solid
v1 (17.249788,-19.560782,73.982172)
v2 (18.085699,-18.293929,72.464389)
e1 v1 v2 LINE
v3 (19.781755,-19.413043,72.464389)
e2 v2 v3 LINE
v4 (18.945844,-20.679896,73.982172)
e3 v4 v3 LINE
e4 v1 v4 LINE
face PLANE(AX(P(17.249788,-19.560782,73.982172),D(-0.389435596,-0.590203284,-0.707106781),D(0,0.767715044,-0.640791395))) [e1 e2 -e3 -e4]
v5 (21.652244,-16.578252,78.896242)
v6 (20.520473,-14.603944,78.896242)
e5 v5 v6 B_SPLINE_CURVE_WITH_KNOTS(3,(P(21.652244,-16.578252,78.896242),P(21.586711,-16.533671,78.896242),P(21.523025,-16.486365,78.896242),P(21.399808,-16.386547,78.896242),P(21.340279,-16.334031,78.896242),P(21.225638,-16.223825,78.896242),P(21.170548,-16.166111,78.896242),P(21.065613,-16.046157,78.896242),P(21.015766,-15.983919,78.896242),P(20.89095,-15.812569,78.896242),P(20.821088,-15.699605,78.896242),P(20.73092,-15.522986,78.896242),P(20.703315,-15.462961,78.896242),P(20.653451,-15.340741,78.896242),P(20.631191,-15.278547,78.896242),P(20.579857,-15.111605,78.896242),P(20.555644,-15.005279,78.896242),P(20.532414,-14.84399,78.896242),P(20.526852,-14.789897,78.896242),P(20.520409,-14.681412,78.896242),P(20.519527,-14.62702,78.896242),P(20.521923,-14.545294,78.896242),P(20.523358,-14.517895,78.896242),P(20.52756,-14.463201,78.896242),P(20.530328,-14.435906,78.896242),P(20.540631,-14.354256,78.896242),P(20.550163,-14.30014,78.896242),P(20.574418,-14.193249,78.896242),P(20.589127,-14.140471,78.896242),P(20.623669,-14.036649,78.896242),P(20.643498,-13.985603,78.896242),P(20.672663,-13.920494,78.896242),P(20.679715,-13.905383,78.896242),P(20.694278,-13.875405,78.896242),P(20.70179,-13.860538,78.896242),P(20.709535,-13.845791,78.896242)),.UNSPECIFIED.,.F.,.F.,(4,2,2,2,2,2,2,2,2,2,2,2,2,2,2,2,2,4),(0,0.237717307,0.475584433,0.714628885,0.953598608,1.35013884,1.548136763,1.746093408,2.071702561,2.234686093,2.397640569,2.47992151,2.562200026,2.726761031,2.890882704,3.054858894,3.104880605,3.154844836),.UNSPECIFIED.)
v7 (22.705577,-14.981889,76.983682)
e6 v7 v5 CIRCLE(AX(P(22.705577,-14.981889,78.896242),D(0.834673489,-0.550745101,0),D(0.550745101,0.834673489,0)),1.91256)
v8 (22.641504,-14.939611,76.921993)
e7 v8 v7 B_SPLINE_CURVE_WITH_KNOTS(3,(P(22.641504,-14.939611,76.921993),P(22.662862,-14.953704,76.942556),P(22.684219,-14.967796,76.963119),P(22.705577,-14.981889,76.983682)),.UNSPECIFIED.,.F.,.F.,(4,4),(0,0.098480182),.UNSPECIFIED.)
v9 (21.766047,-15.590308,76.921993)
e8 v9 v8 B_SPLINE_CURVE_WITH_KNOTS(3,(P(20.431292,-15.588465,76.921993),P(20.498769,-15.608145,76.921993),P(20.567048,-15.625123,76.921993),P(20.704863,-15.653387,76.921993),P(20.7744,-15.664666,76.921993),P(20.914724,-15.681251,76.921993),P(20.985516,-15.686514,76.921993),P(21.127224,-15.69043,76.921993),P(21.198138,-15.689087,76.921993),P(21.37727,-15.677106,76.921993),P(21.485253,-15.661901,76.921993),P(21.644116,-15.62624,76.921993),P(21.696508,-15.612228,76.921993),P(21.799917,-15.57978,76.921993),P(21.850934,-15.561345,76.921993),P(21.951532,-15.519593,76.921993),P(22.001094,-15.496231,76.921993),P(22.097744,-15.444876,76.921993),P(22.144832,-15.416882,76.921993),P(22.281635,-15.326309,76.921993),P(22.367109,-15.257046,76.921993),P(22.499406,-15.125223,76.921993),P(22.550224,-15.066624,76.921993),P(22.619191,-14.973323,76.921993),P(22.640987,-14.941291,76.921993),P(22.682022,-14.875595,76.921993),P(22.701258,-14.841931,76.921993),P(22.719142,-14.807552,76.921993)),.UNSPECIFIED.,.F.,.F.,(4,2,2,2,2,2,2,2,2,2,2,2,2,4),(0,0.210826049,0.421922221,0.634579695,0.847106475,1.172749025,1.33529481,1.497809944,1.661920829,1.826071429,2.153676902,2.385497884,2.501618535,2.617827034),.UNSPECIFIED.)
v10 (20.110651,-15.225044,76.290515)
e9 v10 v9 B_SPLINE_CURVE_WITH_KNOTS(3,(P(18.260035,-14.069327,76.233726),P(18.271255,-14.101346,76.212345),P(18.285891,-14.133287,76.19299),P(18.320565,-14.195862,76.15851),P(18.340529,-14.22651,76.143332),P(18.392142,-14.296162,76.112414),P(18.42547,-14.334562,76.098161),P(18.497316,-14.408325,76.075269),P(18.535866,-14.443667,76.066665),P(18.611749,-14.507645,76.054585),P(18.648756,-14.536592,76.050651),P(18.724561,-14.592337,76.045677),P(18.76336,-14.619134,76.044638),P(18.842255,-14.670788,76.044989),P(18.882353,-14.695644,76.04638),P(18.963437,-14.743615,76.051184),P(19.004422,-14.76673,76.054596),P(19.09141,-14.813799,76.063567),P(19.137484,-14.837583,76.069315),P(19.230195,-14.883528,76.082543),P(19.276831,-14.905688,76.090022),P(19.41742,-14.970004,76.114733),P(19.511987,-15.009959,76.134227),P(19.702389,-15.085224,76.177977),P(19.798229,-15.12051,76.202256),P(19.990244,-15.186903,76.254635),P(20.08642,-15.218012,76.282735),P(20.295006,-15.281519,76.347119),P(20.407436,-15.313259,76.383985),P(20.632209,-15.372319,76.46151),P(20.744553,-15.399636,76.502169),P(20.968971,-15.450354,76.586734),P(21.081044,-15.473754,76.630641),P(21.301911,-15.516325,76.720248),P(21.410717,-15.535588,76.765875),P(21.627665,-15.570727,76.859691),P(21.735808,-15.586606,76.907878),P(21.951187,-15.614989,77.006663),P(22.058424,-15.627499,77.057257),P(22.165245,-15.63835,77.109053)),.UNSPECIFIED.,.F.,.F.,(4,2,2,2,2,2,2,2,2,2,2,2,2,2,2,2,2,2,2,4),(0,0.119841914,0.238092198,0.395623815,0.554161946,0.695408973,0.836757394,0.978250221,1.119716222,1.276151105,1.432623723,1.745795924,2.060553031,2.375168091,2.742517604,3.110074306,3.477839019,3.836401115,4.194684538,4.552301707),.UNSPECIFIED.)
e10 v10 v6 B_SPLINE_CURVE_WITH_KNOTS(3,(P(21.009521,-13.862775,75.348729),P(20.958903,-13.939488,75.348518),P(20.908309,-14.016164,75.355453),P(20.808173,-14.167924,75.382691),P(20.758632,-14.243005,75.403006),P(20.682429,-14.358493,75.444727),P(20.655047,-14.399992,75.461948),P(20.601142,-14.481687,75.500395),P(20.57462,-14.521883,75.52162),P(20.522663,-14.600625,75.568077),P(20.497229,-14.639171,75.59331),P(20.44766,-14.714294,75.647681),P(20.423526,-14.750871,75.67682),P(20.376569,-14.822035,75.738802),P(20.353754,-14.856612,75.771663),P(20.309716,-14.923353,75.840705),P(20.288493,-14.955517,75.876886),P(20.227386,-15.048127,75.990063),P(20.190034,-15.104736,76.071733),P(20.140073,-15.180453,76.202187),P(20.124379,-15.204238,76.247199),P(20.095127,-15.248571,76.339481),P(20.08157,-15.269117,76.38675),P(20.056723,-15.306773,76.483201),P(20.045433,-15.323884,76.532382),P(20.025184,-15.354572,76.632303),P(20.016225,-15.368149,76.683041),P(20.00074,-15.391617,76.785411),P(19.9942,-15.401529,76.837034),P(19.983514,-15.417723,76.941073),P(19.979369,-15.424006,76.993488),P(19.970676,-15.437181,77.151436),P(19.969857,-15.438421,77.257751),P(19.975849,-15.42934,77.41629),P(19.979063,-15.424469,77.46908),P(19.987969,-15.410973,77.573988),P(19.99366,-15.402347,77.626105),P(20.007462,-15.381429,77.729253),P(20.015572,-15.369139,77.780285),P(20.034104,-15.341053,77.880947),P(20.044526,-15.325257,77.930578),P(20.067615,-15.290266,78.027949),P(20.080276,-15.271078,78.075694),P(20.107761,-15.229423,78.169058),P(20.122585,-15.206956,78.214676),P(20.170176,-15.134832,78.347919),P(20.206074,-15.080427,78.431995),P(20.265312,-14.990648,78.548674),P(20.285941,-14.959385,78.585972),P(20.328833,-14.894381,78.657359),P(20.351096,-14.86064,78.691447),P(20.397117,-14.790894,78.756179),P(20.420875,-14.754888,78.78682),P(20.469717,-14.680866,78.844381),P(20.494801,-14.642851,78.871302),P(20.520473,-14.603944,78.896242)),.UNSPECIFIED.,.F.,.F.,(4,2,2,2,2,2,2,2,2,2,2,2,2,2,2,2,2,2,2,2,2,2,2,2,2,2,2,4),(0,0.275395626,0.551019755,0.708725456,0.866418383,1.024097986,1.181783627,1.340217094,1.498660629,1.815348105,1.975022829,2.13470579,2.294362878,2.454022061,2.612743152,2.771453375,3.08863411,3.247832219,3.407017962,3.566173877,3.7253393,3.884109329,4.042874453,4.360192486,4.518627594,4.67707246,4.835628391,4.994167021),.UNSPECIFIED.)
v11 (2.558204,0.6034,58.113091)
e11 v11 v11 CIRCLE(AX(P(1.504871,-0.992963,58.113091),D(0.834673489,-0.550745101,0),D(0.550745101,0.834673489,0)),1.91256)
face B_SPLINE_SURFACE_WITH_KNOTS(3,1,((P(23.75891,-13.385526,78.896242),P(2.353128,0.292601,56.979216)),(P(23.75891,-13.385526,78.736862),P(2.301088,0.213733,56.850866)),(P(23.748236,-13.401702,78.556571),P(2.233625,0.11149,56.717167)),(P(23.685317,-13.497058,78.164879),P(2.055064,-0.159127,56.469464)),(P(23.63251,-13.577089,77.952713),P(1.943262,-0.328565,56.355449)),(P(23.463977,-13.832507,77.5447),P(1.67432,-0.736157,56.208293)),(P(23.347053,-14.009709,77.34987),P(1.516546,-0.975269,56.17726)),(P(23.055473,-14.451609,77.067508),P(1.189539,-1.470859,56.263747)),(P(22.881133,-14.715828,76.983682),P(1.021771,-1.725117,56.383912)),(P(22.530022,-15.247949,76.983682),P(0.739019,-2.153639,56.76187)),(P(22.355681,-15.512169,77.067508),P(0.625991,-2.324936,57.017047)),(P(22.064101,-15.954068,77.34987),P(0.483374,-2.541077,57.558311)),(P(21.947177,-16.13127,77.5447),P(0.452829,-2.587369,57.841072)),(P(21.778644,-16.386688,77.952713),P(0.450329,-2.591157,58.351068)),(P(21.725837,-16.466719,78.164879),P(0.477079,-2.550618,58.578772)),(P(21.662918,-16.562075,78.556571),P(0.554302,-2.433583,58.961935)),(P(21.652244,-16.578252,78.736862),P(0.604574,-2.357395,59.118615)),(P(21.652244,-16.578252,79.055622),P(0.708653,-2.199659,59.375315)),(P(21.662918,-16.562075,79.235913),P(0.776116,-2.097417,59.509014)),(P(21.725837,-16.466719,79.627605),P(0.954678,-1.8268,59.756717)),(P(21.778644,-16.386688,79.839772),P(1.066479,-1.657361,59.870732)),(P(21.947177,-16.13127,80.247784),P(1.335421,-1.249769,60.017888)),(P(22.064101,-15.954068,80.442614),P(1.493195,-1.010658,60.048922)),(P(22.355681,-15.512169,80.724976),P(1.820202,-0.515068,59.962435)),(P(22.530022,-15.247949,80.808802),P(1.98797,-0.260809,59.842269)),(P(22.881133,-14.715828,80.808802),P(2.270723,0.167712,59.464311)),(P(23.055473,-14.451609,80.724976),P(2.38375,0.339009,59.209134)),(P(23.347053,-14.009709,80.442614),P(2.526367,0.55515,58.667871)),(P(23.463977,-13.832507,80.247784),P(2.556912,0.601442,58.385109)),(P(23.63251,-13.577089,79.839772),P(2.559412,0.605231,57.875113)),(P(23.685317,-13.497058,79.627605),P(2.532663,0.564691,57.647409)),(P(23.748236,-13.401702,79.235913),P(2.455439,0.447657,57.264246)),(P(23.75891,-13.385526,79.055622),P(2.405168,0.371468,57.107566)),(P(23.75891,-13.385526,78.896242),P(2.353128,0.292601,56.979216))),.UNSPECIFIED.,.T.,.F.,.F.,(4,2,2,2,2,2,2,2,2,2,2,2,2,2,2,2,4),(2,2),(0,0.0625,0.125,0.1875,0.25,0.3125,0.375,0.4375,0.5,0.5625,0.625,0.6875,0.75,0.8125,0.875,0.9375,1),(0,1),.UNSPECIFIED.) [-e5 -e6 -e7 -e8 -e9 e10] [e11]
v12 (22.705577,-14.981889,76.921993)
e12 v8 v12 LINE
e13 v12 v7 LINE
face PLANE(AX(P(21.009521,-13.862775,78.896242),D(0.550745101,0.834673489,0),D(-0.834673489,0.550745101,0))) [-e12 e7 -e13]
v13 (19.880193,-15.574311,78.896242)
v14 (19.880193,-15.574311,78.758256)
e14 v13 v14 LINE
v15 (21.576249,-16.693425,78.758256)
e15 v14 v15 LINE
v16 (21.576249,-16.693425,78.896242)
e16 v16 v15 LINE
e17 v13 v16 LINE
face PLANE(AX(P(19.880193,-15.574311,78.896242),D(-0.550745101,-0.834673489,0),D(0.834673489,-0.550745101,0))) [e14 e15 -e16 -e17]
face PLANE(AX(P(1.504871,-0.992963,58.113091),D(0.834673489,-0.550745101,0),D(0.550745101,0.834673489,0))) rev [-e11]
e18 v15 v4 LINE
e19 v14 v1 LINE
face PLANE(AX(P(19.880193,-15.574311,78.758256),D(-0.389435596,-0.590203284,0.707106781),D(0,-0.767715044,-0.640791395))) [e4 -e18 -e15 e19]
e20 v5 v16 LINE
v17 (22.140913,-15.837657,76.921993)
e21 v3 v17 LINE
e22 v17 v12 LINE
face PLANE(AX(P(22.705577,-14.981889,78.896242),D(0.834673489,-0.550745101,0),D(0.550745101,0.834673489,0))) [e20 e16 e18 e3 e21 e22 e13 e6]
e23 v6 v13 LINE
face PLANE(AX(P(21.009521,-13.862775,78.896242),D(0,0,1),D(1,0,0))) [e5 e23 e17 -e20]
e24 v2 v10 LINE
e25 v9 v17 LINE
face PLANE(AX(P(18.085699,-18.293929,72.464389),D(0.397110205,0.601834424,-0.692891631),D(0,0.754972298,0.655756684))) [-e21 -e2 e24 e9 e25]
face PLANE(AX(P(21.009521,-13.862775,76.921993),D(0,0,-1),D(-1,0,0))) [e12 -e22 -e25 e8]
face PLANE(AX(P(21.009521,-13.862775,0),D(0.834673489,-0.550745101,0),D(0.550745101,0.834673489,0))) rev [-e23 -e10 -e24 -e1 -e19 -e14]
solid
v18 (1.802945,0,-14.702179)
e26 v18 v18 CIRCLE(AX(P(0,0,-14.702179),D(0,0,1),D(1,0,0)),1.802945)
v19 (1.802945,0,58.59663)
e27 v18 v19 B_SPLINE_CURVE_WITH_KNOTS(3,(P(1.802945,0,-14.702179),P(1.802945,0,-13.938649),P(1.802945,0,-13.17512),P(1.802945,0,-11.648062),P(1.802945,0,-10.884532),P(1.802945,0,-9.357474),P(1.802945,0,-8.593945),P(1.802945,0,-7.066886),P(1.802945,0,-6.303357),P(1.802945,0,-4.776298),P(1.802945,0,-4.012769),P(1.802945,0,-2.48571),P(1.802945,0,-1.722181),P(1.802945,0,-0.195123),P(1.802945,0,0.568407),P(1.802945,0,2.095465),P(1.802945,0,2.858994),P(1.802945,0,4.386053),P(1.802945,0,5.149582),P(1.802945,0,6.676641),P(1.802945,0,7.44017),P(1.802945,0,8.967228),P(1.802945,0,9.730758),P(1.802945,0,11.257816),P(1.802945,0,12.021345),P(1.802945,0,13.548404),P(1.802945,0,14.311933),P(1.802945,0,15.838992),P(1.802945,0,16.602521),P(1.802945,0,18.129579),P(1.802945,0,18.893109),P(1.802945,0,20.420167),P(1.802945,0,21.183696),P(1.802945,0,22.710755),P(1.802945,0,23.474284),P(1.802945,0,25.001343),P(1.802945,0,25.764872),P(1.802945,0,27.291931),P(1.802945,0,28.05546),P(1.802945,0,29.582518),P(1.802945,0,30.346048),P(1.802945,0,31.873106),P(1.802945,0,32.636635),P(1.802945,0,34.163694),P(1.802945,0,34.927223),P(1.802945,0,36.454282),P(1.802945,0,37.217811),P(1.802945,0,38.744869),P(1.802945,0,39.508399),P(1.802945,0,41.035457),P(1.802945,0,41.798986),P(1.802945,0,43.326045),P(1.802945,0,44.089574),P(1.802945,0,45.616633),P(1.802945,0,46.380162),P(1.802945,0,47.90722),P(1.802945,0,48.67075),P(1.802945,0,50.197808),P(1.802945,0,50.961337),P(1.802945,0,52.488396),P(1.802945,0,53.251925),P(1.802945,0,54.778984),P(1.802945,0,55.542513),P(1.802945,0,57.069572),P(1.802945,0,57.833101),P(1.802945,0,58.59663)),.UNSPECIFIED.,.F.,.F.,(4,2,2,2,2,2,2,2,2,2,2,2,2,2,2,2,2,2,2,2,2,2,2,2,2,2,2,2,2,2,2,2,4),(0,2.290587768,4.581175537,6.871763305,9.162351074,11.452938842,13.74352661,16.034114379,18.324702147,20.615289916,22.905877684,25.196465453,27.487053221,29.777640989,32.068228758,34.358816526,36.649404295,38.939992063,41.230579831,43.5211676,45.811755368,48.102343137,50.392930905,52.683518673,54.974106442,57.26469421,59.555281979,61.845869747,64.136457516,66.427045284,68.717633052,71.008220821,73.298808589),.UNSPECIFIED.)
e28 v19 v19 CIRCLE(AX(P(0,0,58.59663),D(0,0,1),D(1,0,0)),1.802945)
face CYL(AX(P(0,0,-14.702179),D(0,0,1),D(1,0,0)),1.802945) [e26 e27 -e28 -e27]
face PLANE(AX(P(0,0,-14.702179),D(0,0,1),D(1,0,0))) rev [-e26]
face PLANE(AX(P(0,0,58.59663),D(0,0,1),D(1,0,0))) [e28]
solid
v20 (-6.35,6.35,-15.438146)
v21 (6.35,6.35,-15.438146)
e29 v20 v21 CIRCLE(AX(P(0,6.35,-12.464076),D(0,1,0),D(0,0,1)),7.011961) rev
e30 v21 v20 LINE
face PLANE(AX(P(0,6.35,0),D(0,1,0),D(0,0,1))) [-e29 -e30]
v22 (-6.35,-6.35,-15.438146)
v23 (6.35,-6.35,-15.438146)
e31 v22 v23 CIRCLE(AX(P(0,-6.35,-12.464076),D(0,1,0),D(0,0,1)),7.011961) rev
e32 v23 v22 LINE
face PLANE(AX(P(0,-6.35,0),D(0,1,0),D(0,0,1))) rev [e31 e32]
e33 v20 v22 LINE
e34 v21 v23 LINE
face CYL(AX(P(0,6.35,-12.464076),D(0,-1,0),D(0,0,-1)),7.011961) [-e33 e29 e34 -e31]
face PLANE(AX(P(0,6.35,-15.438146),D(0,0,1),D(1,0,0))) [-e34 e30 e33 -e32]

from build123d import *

# Parameters (mm, degrees)
BOSS_EXTRUDE1_DEPTH      = 58.596630013
BOSS_EXTRUDE1_DEPTH_BACK = 14.702178577
SKETCH1_R                = 1.802945267
BOSS_EXTRUDE2_DEPTH      = 6.35
BOSS_EXTRUDE4_DEPTH      = 2.032


with BuildPart() as part:
    # Sketch1 → Boss-Extrude1 (new, two sides: drawn at the far end of the back side and taken through both)
    with BuildSketch(Plane.XY.offset(-BOSS_EXTRUDE1_DEPTH_BACK)):
        Circle(SKETCH1_R)
    extrude(amount=BOSS_EXTRUDE1_DEPTH + BOSS_EXTRUDE1_DEPTH_BACK)


with BuildPart() as body_2:
    # Sketch2 → Boss-Extrude2 (new, symmetric)
    with BuildSketch(Plane(origin=(0, 0, -18.001846855), x_dir=(1, 0, 0), z_dir=(0, 1, 0))):
        with BuildLine():
            Line((-6.35, -2.563701192), (0, -2.563701192))
            Line((0, -2.563701192), (6.35, -2.563701192))
            ThreePointArc((6.35, -2.563701192), (0, 1.474189404), (-6.35, -2.563701192))
        make_face()
    extrude(amount=BOSS_EXTRUDE2_DEPTH, both=True)


with BuildPart() as body_3:
    # Loft1: read off the stored shape, not the designer's step
    # Loft1: loft between two sections, ruled curve by curve
    loft1_from = [
        Edge.make_bspline([(23.758910272, -13.385525744, 78.896242126), (23.758910272, -13.385525744, 78.73686213), (23.748236498, -13.401702223, 78.556571478), (23.685317405, -13.497058312, 78.164879199), (23.632510309, -13.577089315, 77.952712548), (23.463977025, -13.83250741, 77.544699757), (23.347053414, -14.009709237, 77.34987012), (23.055473338, -14.451609055, 77.067508327), (22.881132751, -14.715828321, 76.98368217), (22.530021742, -15.247949351, 76.98368217), (22.355681154, -15.512168617, 77.067508327), (22.064101078, -15.954068435, 77.34987012), (21.947177467, -16.131270262, 77.544699757), (21.778644183, -16.386688357, 77.952712548), (21.725837088, -16.46671936, 78.164879199), (21.662917995, -16.562075449, 78.556571478), (21.65224422, -16.578251928, 78.73686213), (21.65224422, -16.578251928, 79.055622122), (21.662917995, -16.562075449, 79.235912774), (21.725837088, -16.46671936, 79.627605053), (21.778644183, -16.386688357, 79.839771704), (21.947177467, -16.131270262, 80.247784495), (22.064101078, -15.954068435, 80.442614132), (22.355681154, -15.512168617, 80.724975925), (22.530021742, -15.247949351, 80.808802082), (22.881132751, -14.715828321, 80.808802082), (23.055473338, -14.451609055, 80.724975925), (23.347053414, -14.009709237, 80.442614132), (23.463977025, -13.83250741, 80.247784495), (23.632510309, -13.577089315, 79.839771704), (23.685317405, -13.497058312, 79.627605053), (23.748236498, -13.401702223, 79.235912774), (23.758910272, -13.385525744, 79.055622122), (23.758910272, -13.385525744, 78.896242126)], [0, 0, 0, 0, 0.0625, 0.0625, 0.125, 0.125, 0.1875, 0.1875, 0.25, 0.25, 0.3125, 0.3125, 0.375, 0.375, 0.4375, 0.4375, 0.5, 0.5, 0.5625, 0.5625, 0.625, 0.625, 0.6875, 0.6875, 0.75, 0.75, 0.8125, 0.8125, 0.875, 0.875, 0.9375, 0.9375, 1, 1, 1, 1], 3),
    ]
    loft1_to = [
        Edge.make_bspline([(2.353128009, 0.292600514, 56.97921639), (2.30108837, 0.213732618, 56.850866422), (2.233625455, 0.111490208, 56.717166863), (2.055063597, -0.159126542, 56.469464069), (1.943262459, -0.328565082, 56.355449486), (1.6743198, -0.736157101, 56.208293442), (1.516545887, -0.975268991, 56.17725956), (1.189539359, -1.470858837, 56.263746597), (1.02177118, -1.725117388, 56.383911953), (0.739018716, -2.15363865, 56.761870025), (0.625991196, -2.324935817, 57.017047112), (0.483374254, -2.541076787, 57.558310506), (0.452829155, -2.587368953, 57.84107231), (0.450329449, -2.591157347, 58.351068102), (0.477078646, -2.550618002, 58.578772473), (0.554302021, -2.433583272, 58.961935441), (0.604573586, -2.357394955, 59.11861485), (0.708652864, -2.199659164, 59.375314785), (0.776115778, -2.097416754, 59.509014344), (0.954677637, -1.826800004, 59.756717138), (1.066478775, -1.657361463, 59.870731722), (1.335421433, -1.249769445, 60.017887765), (1.493195346, -1.010657554, 60.048921647), (1.820201874, -0.515067708, 59.962434611), (1.987970053, -0.260809157, 59.842269254), (2.270722517, 0.167712105, 59.464311182), (2.383750038, 0.339009271, 59.209134095), (2.52636698, 0.555150241, 58.667870701), (2.556912078, 0.601442408, 58.385108897), (2.559411785, 0.605230801, 57.875113105), (2.532662588, 0.564691456, 57.647408734), (2.455439213, 0.447656726, 57.264245767), (2.405167648, 0.371468409, 57.107566358), (2.353128009, 0.292600514, 56.97921639)], [0, 0, 0, 0, 0.0625, 0.0625, 0.125, 0.125, 0.1875, 0.1875, 0.25, 0.25, 0.3125, 0.3125, 0.375, 0.375, 0.4375, 0.4375, 0.5, 0.5, 0.5625, 0.5625, 0.625, 0.625, 0.6875, 0.6875, 0.75, 0.75, 0.8125, 0.8125, 0.875, 0.875, 0.9375, 0.9375, 1, 1, 1, 1], 3),
    ]
    loft1 = Solid(Shell([*[Face.make_surface_from_curves(loft1_from[k], loft1_to[k]) for k in range(1)], Face(Wire(loft1_from)), Face(Wire(loft1_to))]))
    add(loft1)

    # Sketch8 → Boss-Extrude4 (add)
    with BuildSketch(Plane(origin=(22.705577246, -14.981888836, 0), x_dir=(0, 0, -1), z_dir=(0.8346734893476622, -0.5507451009134791, 0))):
        Polygon((-78.75825642, -2.050545662), (-73.982171856, -6.826630226), (-72.464389408, -5.308847777), (-76.921993148, -1.025272831), (-76.921993148, 0), (-78.896242126, 0), (-78.896242126, -2.050545662), align=None)
    extrude(amount=-BOSS_EXTRUDE4_DEPTH)


solid = Compound([part.part, body_2.part, body_3.part])
